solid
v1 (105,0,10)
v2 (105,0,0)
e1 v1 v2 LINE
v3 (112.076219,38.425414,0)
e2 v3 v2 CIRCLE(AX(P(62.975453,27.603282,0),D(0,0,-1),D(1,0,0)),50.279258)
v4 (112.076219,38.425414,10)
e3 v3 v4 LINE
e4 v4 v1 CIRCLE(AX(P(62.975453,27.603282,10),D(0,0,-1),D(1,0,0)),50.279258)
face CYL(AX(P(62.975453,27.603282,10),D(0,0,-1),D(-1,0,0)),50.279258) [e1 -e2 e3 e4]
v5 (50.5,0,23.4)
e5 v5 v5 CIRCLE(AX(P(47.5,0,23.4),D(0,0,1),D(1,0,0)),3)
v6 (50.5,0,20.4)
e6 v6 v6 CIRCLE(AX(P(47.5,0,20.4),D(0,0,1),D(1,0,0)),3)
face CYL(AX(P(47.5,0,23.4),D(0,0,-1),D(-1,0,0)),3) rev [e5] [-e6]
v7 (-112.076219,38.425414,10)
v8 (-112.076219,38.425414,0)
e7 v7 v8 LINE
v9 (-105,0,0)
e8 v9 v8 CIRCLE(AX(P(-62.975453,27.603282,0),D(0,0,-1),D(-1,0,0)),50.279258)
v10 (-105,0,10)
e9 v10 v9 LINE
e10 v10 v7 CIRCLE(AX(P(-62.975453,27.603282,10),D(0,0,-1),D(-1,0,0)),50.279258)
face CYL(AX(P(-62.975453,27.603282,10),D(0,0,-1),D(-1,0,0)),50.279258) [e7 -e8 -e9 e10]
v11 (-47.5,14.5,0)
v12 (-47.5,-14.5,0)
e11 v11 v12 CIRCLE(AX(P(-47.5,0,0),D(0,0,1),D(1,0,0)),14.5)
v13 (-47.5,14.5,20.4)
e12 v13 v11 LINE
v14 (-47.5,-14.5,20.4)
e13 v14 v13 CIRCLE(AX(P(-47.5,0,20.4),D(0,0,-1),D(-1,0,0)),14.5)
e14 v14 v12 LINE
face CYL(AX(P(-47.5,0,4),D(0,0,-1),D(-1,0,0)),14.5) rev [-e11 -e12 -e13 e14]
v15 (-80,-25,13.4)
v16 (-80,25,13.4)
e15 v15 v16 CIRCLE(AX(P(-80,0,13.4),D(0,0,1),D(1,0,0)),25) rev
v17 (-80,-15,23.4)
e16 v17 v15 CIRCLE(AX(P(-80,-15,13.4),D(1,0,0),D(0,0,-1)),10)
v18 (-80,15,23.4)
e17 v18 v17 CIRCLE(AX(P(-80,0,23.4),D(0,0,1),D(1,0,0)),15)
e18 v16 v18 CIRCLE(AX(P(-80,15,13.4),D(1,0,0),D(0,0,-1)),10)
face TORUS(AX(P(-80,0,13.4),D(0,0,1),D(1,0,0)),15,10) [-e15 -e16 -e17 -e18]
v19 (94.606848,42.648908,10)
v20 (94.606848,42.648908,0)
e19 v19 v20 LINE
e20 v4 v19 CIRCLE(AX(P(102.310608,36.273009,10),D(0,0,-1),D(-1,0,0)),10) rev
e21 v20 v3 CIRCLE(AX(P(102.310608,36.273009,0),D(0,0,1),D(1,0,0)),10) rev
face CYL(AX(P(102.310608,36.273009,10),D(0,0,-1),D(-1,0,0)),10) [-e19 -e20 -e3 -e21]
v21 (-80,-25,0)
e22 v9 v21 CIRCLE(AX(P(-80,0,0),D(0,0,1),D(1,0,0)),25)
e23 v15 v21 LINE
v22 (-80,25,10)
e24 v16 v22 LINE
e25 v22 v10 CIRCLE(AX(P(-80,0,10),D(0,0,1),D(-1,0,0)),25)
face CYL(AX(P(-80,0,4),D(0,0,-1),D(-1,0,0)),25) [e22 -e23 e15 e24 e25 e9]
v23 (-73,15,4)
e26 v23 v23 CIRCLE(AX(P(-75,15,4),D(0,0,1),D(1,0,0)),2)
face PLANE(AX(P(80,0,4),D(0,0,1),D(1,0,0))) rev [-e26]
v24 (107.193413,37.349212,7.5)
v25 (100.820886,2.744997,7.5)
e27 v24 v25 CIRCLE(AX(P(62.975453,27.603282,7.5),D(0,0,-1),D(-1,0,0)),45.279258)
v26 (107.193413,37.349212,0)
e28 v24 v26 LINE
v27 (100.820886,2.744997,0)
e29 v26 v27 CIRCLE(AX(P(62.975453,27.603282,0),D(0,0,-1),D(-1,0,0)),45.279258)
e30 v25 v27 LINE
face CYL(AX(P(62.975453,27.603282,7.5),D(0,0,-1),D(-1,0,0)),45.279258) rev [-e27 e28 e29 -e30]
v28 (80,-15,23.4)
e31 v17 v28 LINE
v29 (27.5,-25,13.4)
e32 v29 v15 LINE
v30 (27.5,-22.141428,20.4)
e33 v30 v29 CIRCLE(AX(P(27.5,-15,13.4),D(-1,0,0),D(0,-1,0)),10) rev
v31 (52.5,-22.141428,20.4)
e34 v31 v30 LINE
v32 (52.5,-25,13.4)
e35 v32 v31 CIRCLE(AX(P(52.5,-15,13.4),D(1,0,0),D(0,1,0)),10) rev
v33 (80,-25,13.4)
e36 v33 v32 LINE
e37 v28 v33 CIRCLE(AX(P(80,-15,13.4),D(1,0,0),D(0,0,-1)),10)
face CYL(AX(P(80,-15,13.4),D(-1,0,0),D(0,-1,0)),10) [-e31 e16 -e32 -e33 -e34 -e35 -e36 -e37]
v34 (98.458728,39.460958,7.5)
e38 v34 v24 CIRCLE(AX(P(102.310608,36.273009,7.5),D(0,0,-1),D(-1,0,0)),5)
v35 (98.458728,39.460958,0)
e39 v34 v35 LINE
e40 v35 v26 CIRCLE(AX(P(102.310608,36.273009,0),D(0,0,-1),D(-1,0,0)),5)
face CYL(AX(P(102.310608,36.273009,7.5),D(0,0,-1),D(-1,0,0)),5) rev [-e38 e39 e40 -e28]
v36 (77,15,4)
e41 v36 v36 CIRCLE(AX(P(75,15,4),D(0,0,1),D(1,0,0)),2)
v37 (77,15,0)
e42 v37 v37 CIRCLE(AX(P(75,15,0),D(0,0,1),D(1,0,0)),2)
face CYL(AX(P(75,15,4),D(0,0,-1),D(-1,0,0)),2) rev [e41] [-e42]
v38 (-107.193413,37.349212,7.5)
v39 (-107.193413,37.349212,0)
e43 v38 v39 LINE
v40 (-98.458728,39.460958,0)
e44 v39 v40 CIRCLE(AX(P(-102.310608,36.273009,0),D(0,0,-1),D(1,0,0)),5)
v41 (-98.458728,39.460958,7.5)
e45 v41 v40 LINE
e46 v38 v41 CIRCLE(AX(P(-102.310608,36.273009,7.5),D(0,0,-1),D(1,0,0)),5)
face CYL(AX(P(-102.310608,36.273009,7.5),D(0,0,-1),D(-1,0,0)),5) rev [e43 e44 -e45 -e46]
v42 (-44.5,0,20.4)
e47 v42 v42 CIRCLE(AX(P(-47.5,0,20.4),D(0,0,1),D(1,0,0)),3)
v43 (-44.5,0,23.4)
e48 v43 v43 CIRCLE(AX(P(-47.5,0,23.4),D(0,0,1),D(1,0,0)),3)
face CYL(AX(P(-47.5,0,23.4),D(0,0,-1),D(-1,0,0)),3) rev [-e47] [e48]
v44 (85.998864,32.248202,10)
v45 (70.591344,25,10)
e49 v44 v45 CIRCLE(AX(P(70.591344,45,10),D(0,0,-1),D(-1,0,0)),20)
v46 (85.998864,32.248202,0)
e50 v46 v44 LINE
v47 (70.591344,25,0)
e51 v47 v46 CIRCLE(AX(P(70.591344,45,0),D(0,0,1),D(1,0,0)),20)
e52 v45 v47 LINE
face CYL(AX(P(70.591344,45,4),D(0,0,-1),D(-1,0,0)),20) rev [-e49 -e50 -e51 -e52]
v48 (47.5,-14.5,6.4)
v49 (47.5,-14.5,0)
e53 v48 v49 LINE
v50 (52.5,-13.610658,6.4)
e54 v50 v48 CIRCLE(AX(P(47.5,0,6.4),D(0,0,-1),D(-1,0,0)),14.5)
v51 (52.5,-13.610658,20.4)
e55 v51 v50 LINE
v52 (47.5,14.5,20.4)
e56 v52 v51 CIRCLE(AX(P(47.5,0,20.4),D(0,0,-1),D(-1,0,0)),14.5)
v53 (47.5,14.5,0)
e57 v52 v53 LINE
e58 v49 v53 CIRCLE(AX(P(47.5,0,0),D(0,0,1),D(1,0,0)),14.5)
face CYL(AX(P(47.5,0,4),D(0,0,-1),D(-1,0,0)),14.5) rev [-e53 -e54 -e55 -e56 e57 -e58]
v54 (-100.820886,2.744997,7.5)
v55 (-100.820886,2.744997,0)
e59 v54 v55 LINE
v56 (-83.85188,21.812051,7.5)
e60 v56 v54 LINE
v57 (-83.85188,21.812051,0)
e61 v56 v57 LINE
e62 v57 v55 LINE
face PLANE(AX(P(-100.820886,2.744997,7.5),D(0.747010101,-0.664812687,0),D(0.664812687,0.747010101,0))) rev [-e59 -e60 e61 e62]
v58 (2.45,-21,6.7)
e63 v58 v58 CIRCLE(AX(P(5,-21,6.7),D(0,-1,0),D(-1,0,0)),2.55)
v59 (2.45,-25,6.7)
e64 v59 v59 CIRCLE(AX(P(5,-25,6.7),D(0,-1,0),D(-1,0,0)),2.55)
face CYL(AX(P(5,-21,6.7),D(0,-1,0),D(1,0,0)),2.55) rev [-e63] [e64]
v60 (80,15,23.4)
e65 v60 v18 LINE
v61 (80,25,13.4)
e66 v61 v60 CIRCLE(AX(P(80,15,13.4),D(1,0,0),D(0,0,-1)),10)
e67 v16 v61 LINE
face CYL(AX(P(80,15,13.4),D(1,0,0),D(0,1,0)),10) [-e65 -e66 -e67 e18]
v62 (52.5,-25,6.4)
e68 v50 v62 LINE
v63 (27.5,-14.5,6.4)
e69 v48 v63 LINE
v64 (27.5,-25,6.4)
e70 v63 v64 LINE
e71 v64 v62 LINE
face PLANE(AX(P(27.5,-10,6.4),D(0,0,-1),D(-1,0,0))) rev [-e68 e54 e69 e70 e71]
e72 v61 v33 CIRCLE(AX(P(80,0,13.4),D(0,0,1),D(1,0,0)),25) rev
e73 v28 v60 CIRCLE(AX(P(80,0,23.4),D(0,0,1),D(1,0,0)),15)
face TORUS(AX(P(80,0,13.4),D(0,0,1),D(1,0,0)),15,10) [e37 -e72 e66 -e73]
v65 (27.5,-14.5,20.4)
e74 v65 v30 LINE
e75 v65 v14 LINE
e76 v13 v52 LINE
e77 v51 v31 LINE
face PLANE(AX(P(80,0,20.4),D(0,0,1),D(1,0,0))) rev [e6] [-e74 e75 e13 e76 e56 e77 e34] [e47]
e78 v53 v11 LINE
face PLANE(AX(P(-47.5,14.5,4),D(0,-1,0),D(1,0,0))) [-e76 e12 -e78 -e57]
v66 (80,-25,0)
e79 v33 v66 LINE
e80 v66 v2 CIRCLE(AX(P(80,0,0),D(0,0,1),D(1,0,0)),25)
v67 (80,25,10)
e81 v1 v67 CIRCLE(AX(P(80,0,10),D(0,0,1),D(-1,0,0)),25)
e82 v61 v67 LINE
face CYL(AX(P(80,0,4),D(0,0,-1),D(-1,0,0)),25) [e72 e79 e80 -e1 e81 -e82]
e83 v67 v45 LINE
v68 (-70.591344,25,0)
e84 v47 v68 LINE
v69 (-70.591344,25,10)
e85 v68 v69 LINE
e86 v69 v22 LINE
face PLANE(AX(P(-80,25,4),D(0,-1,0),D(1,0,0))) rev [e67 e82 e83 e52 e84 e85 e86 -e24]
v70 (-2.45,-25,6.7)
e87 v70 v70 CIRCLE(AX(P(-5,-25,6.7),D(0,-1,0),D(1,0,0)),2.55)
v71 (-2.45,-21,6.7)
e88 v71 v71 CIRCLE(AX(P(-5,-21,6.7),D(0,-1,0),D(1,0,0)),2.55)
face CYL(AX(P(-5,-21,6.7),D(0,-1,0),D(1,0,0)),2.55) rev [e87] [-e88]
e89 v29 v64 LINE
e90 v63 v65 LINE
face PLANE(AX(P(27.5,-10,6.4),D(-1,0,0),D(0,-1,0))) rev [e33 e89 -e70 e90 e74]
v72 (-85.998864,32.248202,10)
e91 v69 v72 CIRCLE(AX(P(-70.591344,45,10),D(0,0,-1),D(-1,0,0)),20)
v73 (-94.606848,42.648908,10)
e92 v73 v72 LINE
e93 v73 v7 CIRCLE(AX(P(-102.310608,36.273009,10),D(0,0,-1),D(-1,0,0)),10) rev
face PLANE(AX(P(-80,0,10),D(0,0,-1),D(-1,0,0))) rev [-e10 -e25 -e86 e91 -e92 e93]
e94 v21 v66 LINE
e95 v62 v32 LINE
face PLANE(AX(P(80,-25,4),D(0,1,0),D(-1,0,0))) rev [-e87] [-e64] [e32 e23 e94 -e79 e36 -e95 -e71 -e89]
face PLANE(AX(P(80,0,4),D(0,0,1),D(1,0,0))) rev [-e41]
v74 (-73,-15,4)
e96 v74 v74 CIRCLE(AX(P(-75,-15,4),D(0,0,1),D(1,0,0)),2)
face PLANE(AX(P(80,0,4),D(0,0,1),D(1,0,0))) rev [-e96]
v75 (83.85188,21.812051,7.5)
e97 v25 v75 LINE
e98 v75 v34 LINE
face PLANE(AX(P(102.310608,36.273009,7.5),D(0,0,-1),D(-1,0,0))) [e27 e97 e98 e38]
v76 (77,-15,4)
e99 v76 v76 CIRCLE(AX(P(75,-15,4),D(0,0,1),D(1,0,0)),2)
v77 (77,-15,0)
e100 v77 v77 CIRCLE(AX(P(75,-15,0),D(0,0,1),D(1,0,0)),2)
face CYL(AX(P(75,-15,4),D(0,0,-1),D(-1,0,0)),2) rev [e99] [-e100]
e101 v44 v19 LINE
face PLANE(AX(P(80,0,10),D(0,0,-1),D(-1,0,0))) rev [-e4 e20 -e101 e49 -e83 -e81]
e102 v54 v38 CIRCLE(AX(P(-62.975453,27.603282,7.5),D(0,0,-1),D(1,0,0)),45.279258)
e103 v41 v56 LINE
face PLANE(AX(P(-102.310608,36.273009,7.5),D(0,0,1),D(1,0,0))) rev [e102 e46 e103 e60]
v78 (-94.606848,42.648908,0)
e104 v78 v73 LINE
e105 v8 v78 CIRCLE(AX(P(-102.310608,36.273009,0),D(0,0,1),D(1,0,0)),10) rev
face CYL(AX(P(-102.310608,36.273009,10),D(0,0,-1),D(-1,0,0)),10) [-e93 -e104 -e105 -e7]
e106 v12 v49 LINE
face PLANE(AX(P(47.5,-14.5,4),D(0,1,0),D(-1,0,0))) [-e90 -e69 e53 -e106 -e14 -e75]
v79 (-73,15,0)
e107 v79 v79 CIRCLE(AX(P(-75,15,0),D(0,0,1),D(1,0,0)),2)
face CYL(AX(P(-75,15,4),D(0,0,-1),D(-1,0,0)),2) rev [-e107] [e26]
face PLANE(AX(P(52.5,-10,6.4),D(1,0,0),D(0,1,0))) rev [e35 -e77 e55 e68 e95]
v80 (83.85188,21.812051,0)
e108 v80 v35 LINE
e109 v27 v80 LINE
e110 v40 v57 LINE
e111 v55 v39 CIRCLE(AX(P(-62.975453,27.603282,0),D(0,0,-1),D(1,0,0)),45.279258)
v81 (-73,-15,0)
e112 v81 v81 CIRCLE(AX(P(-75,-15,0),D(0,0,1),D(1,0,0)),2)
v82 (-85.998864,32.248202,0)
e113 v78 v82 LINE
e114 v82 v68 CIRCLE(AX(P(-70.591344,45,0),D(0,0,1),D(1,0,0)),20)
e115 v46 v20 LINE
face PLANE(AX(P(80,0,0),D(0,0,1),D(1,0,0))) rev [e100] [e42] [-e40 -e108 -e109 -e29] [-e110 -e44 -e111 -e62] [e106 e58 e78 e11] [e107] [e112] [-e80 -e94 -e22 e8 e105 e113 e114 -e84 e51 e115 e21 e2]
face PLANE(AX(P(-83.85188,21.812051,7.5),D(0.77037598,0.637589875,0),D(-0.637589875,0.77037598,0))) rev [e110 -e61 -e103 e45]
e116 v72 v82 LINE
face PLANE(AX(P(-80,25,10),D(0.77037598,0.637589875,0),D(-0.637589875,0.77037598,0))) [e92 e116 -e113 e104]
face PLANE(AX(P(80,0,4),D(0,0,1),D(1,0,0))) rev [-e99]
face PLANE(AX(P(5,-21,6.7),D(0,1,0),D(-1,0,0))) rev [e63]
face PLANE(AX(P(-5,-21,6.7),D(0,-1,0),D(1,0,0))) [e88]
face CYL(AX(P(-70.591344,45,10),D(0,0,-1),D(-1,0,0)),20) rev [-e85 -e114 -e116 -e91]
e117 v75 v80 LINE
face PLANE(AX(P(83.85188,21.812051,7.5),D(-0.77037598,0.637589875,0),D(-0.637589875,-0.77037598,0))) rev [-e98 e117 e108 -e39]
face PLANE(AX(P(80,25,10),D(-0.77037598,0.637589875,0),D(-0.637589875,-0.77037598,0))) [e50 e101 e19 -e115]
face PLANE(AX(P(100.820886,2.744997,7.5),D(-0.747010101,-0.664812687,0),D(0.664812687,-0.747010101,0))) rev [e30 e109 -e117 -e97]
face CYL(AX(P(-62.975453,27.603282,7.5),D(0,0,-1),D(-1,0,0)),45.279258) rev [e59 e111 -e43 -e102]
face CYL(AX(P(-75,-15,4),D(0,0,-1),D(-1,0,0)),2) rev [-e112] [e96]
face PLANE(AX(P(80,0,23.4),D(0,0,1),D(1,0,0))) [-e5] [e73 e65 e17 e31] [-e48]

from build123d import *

# Parameters (mm, degrees)
SKETCH1_R           = 2
BOSS_EXTRUDE1_DEPTH = 4
BOSS_EXTRUDE2_DEPTH = 16.4
SKETCH3_R           = 3
BOSS_EXTRUDE3_DEPTH = 3
FILLET1_R           = 10
BOSS_EXTRUDE4_DEPTH = 10
FILLET3_R           = 10
CUT_EXTRUDE3_DEPTH  = 7.5
SKETCH9_W           = 25
SKETCH9_H           = 14
CUT_EXTRUDE4_DEPTH  = 15
FILLET4_R           = 20
SKETCH10_R          = 2.55
CUT_EXTRUDE5_DEPTH  = 4


with BuildPart() as part:
    # Sketch1 → Boss-Extrude1 (new body)
    with BuildSketch(Plane.XY):
        with BuildLine():
            Line((80, -25), (-80, -25))
            ThreePointArc((-80, -25), (-105, 0), (-80, 25))
            Line((-80, 25), (80, 25))
            ThreePointArc((80, 25), (105, 0), (80, -25))
        make_face()
        with Locations((75, -15)):
            Circle(SKETCH1_R, mode=Mode.SUBTRACT)
        with Locations((75, 15)):
            Circle(SKETCH1_R, mode=Mode.SUBTRACT)
        with Locations((-75, -15)):
            Circle(SKETCH1_R, mode=Mode.SUBTRACT)
        with Locations((-75, 15)):
            Circle(SKETCH1_R, mode=Mode.SUBTRACT)
        with BuildLine():
            Line((47.5, -14.5), (-47.5, -14.5))
            ThreePointArc((-47.5, -14.5), (-62, 0), (-47.5, 14.5))
            Line((-47.5, 14.5), (47.5, 14.5))
            ThreePointArc((47.5, 14.5), (62, 0), (47.5, -14.5))
        make_face(mode=Mode.SUBTRACT)
    extrude(amount=BOSS_EXTRUDE1_DEPTH)

    # Sketch2 → Boss-Extrude2 (add)
    with BuildSketch(Plane.XY.offset(4)):
        with BuildLine():
            Line((80, 25), (-80, 25))
            ThreePointArc((-80, 25), (-105, 0), (-80, -25))
            Line((-80, -25), (80, -25))
            ThreePointArc((80, -25), (105, 0), (80, 25))
        make_face()
        with BuildLine():
            Line((47.5, 14.5), (-47.5, 14.5))
            ThreePointArc((-47.5, 14.5), (-62, 0), (-47.5, -14.5))
            Line((-47.5, -14.5), (47.5, -14.5))
            ThreePointArc((47.5, -14.5), (62, 0), (47.5, 14.5))
        make_face(mode=Mode.SUBTRACT)
    extrude(amount=BOSS_EXTRUDE2_DEPTH)

    # Sketch3 → Boss-Extrude3 (add)
    with BuildSketch(Plane.XY.offset(20.4)):
        with BuildLine():
            Line((80, 25), (-80, 25))
            ThreePointArc((-80, 25), (-105, 0), (-80, -25))
            Line((-80, -25), (80, -25))
            ThreePointArc((80, -25), (105, 0), (80, 25))
        make_face()
        with Locations((-47.5, 0)):
            Circle(SKETCH3_R, mode=Mode.SUBTRACT)
        with Locations((47.5, 0)):
            Circle(SKETCH3_R, mode=Mode.SUBTRACT)
    extrude(amount=BOSS_EXTRUDE3_DEPTH)

    # Fillet1
    fillet1_edges = [part.edges().sort_by_distance(p)[0] for p in [
        (105, 0, 23.4),
        (0, 25, 23.4),
        (-105, 0, 23.4),
        (0, -25, 23.4),
    ]]
    fillet(fillet1_edges, radius=FILLET1_R)

    # Sketch4 → Boss-Extrude4 (add)
    with BuildSketch(Plane(origin=(0, 0, 0), x_dir=(-1, 0, 0), z_dir=(0, 0, -1))):
        with BuildLine():
            Line((80, 25), (105, 55.206564225))
            ThreePointArc((105, 55.206564225), (113.254710442, 27.603282112), (105, 0))
            ThreePointArc((105, 0), (97.67766953, 17.67766953), (80, 25))
        make_face()
        with BuildLine():
            Line((-80, 25), (-105, 55.206564225))
            ThreePointArc((-105, 55.206564225), (-113.254710442, 27.603282112), (-105, 0))
            ThreePointArc((-105, 0), (-97.67766953, 17.67766953), (-80, 25))
        make_face()
    extrude(amount=-BOSS_EXTRUDE4_DEPTH)

    # Fillet3
    fillet3_edges = [part.edges().sort_by_distance(p)[0] for p in [
        (105, 55.206564225, 5),
        (-105, 55.206564225, 5),
    ]]
    fillet(fillet3_edges, radius=FILLET3_R)

    # Sketch8 → Cut-Extrude3 (cut)
    with BuildSketch(Plane(origin=(0, 0, 0), x_dir=(-1, 0, 0), z_dir=(0, 0, -1))):
        with BuildLine():
            Line((-100.820886267, 2.744996978), (-83.851879902, 21.812050625))
            Line((-83.851879902, 21.812050625), (-98.458728042, 39.460958483))
            ThreePointArc((-98.458728042, 39.460958483), (-103.485584806, 41.132991554), (-107.19341332, 37.349211536))
            ThreePointArc((-107.19341332, 37.349211536), (-107.505926341, 19.402788283), (-100.820886267, 2.744996978))
        make_face()
        with BuildLine():
            Line((83.851879902, 21.812050625), (98.458728042, 39.460958483))
            ThreePointArc((98.458728042, 39.460958483), (103.485584806, 41.132991554), (107.19341332, 37.349211536))
            ThreePointArc((107.19341332, 37.349211536), (107.505926341, 19.402788283), (100.820886267, 2.744996978))
            Line((100.820886267, 2.744996978), (83.851879902, 21.812050625))
        make_face()
    extrude(amount=-CUT_EXTRUDE3_DEPTH, mode=Mode.SUBTRACT)

    # Sketch9 → Cut-Extrude4 (cut)
    with BuildSketch(Plane.XZ.offset(25)):
        with Locations((40, 13.4)):
            Rectangle(SKETCH9_W, SKETCH9_H)
    extrude(amount=-CUT_EXTRUDE4_DEPTH, mode=Mode.SUBTRACT)

    # Fillet4
    # the kernel refuses this fillet: 20 mm, written as the material it adds along each edge
    with BuildSketch(Plane(origin=(80, 25, 10), x_dir=(-1, 0, 0), z_dir=(0, 0, -1)), Plane(origin=(-80, 25, 10), x_dir=(-0.6375898750759507, 0.7703759804151696, 0), z_dir=(0, 0, -1))) as fillet4_piece_1:
        with BuildLine():
            CenterArc((FILLET4_R * 0.470432794035, FILLET4_R), FILLET4_R, 219.612336421, 50.387663579)
            Line((-FILLET4_R * 0.29994318638, FILLET4_R * 0.362410124924), (0, 0))
            Line((0, 0), (FILLET4_R * 0.470432794035, 0))
        make_face()
    extrude(amount=10)

    # Sketch10 → Cut-Extrude5 (cut)
    with BuildSketch(Plane.XZ.offset(25)):
        with Locations((-5, 6.7)):
            Circle(SKETCH10_R)
        with Locations(Location((5, 6.7, 0), (0, 0, 180))):
            Circle(SKETCH10_R)
    extrude(amount=-CUT_EXTRUDE5_DEPTH, mode=Mode.SUBTRACT)


solid = part.part
